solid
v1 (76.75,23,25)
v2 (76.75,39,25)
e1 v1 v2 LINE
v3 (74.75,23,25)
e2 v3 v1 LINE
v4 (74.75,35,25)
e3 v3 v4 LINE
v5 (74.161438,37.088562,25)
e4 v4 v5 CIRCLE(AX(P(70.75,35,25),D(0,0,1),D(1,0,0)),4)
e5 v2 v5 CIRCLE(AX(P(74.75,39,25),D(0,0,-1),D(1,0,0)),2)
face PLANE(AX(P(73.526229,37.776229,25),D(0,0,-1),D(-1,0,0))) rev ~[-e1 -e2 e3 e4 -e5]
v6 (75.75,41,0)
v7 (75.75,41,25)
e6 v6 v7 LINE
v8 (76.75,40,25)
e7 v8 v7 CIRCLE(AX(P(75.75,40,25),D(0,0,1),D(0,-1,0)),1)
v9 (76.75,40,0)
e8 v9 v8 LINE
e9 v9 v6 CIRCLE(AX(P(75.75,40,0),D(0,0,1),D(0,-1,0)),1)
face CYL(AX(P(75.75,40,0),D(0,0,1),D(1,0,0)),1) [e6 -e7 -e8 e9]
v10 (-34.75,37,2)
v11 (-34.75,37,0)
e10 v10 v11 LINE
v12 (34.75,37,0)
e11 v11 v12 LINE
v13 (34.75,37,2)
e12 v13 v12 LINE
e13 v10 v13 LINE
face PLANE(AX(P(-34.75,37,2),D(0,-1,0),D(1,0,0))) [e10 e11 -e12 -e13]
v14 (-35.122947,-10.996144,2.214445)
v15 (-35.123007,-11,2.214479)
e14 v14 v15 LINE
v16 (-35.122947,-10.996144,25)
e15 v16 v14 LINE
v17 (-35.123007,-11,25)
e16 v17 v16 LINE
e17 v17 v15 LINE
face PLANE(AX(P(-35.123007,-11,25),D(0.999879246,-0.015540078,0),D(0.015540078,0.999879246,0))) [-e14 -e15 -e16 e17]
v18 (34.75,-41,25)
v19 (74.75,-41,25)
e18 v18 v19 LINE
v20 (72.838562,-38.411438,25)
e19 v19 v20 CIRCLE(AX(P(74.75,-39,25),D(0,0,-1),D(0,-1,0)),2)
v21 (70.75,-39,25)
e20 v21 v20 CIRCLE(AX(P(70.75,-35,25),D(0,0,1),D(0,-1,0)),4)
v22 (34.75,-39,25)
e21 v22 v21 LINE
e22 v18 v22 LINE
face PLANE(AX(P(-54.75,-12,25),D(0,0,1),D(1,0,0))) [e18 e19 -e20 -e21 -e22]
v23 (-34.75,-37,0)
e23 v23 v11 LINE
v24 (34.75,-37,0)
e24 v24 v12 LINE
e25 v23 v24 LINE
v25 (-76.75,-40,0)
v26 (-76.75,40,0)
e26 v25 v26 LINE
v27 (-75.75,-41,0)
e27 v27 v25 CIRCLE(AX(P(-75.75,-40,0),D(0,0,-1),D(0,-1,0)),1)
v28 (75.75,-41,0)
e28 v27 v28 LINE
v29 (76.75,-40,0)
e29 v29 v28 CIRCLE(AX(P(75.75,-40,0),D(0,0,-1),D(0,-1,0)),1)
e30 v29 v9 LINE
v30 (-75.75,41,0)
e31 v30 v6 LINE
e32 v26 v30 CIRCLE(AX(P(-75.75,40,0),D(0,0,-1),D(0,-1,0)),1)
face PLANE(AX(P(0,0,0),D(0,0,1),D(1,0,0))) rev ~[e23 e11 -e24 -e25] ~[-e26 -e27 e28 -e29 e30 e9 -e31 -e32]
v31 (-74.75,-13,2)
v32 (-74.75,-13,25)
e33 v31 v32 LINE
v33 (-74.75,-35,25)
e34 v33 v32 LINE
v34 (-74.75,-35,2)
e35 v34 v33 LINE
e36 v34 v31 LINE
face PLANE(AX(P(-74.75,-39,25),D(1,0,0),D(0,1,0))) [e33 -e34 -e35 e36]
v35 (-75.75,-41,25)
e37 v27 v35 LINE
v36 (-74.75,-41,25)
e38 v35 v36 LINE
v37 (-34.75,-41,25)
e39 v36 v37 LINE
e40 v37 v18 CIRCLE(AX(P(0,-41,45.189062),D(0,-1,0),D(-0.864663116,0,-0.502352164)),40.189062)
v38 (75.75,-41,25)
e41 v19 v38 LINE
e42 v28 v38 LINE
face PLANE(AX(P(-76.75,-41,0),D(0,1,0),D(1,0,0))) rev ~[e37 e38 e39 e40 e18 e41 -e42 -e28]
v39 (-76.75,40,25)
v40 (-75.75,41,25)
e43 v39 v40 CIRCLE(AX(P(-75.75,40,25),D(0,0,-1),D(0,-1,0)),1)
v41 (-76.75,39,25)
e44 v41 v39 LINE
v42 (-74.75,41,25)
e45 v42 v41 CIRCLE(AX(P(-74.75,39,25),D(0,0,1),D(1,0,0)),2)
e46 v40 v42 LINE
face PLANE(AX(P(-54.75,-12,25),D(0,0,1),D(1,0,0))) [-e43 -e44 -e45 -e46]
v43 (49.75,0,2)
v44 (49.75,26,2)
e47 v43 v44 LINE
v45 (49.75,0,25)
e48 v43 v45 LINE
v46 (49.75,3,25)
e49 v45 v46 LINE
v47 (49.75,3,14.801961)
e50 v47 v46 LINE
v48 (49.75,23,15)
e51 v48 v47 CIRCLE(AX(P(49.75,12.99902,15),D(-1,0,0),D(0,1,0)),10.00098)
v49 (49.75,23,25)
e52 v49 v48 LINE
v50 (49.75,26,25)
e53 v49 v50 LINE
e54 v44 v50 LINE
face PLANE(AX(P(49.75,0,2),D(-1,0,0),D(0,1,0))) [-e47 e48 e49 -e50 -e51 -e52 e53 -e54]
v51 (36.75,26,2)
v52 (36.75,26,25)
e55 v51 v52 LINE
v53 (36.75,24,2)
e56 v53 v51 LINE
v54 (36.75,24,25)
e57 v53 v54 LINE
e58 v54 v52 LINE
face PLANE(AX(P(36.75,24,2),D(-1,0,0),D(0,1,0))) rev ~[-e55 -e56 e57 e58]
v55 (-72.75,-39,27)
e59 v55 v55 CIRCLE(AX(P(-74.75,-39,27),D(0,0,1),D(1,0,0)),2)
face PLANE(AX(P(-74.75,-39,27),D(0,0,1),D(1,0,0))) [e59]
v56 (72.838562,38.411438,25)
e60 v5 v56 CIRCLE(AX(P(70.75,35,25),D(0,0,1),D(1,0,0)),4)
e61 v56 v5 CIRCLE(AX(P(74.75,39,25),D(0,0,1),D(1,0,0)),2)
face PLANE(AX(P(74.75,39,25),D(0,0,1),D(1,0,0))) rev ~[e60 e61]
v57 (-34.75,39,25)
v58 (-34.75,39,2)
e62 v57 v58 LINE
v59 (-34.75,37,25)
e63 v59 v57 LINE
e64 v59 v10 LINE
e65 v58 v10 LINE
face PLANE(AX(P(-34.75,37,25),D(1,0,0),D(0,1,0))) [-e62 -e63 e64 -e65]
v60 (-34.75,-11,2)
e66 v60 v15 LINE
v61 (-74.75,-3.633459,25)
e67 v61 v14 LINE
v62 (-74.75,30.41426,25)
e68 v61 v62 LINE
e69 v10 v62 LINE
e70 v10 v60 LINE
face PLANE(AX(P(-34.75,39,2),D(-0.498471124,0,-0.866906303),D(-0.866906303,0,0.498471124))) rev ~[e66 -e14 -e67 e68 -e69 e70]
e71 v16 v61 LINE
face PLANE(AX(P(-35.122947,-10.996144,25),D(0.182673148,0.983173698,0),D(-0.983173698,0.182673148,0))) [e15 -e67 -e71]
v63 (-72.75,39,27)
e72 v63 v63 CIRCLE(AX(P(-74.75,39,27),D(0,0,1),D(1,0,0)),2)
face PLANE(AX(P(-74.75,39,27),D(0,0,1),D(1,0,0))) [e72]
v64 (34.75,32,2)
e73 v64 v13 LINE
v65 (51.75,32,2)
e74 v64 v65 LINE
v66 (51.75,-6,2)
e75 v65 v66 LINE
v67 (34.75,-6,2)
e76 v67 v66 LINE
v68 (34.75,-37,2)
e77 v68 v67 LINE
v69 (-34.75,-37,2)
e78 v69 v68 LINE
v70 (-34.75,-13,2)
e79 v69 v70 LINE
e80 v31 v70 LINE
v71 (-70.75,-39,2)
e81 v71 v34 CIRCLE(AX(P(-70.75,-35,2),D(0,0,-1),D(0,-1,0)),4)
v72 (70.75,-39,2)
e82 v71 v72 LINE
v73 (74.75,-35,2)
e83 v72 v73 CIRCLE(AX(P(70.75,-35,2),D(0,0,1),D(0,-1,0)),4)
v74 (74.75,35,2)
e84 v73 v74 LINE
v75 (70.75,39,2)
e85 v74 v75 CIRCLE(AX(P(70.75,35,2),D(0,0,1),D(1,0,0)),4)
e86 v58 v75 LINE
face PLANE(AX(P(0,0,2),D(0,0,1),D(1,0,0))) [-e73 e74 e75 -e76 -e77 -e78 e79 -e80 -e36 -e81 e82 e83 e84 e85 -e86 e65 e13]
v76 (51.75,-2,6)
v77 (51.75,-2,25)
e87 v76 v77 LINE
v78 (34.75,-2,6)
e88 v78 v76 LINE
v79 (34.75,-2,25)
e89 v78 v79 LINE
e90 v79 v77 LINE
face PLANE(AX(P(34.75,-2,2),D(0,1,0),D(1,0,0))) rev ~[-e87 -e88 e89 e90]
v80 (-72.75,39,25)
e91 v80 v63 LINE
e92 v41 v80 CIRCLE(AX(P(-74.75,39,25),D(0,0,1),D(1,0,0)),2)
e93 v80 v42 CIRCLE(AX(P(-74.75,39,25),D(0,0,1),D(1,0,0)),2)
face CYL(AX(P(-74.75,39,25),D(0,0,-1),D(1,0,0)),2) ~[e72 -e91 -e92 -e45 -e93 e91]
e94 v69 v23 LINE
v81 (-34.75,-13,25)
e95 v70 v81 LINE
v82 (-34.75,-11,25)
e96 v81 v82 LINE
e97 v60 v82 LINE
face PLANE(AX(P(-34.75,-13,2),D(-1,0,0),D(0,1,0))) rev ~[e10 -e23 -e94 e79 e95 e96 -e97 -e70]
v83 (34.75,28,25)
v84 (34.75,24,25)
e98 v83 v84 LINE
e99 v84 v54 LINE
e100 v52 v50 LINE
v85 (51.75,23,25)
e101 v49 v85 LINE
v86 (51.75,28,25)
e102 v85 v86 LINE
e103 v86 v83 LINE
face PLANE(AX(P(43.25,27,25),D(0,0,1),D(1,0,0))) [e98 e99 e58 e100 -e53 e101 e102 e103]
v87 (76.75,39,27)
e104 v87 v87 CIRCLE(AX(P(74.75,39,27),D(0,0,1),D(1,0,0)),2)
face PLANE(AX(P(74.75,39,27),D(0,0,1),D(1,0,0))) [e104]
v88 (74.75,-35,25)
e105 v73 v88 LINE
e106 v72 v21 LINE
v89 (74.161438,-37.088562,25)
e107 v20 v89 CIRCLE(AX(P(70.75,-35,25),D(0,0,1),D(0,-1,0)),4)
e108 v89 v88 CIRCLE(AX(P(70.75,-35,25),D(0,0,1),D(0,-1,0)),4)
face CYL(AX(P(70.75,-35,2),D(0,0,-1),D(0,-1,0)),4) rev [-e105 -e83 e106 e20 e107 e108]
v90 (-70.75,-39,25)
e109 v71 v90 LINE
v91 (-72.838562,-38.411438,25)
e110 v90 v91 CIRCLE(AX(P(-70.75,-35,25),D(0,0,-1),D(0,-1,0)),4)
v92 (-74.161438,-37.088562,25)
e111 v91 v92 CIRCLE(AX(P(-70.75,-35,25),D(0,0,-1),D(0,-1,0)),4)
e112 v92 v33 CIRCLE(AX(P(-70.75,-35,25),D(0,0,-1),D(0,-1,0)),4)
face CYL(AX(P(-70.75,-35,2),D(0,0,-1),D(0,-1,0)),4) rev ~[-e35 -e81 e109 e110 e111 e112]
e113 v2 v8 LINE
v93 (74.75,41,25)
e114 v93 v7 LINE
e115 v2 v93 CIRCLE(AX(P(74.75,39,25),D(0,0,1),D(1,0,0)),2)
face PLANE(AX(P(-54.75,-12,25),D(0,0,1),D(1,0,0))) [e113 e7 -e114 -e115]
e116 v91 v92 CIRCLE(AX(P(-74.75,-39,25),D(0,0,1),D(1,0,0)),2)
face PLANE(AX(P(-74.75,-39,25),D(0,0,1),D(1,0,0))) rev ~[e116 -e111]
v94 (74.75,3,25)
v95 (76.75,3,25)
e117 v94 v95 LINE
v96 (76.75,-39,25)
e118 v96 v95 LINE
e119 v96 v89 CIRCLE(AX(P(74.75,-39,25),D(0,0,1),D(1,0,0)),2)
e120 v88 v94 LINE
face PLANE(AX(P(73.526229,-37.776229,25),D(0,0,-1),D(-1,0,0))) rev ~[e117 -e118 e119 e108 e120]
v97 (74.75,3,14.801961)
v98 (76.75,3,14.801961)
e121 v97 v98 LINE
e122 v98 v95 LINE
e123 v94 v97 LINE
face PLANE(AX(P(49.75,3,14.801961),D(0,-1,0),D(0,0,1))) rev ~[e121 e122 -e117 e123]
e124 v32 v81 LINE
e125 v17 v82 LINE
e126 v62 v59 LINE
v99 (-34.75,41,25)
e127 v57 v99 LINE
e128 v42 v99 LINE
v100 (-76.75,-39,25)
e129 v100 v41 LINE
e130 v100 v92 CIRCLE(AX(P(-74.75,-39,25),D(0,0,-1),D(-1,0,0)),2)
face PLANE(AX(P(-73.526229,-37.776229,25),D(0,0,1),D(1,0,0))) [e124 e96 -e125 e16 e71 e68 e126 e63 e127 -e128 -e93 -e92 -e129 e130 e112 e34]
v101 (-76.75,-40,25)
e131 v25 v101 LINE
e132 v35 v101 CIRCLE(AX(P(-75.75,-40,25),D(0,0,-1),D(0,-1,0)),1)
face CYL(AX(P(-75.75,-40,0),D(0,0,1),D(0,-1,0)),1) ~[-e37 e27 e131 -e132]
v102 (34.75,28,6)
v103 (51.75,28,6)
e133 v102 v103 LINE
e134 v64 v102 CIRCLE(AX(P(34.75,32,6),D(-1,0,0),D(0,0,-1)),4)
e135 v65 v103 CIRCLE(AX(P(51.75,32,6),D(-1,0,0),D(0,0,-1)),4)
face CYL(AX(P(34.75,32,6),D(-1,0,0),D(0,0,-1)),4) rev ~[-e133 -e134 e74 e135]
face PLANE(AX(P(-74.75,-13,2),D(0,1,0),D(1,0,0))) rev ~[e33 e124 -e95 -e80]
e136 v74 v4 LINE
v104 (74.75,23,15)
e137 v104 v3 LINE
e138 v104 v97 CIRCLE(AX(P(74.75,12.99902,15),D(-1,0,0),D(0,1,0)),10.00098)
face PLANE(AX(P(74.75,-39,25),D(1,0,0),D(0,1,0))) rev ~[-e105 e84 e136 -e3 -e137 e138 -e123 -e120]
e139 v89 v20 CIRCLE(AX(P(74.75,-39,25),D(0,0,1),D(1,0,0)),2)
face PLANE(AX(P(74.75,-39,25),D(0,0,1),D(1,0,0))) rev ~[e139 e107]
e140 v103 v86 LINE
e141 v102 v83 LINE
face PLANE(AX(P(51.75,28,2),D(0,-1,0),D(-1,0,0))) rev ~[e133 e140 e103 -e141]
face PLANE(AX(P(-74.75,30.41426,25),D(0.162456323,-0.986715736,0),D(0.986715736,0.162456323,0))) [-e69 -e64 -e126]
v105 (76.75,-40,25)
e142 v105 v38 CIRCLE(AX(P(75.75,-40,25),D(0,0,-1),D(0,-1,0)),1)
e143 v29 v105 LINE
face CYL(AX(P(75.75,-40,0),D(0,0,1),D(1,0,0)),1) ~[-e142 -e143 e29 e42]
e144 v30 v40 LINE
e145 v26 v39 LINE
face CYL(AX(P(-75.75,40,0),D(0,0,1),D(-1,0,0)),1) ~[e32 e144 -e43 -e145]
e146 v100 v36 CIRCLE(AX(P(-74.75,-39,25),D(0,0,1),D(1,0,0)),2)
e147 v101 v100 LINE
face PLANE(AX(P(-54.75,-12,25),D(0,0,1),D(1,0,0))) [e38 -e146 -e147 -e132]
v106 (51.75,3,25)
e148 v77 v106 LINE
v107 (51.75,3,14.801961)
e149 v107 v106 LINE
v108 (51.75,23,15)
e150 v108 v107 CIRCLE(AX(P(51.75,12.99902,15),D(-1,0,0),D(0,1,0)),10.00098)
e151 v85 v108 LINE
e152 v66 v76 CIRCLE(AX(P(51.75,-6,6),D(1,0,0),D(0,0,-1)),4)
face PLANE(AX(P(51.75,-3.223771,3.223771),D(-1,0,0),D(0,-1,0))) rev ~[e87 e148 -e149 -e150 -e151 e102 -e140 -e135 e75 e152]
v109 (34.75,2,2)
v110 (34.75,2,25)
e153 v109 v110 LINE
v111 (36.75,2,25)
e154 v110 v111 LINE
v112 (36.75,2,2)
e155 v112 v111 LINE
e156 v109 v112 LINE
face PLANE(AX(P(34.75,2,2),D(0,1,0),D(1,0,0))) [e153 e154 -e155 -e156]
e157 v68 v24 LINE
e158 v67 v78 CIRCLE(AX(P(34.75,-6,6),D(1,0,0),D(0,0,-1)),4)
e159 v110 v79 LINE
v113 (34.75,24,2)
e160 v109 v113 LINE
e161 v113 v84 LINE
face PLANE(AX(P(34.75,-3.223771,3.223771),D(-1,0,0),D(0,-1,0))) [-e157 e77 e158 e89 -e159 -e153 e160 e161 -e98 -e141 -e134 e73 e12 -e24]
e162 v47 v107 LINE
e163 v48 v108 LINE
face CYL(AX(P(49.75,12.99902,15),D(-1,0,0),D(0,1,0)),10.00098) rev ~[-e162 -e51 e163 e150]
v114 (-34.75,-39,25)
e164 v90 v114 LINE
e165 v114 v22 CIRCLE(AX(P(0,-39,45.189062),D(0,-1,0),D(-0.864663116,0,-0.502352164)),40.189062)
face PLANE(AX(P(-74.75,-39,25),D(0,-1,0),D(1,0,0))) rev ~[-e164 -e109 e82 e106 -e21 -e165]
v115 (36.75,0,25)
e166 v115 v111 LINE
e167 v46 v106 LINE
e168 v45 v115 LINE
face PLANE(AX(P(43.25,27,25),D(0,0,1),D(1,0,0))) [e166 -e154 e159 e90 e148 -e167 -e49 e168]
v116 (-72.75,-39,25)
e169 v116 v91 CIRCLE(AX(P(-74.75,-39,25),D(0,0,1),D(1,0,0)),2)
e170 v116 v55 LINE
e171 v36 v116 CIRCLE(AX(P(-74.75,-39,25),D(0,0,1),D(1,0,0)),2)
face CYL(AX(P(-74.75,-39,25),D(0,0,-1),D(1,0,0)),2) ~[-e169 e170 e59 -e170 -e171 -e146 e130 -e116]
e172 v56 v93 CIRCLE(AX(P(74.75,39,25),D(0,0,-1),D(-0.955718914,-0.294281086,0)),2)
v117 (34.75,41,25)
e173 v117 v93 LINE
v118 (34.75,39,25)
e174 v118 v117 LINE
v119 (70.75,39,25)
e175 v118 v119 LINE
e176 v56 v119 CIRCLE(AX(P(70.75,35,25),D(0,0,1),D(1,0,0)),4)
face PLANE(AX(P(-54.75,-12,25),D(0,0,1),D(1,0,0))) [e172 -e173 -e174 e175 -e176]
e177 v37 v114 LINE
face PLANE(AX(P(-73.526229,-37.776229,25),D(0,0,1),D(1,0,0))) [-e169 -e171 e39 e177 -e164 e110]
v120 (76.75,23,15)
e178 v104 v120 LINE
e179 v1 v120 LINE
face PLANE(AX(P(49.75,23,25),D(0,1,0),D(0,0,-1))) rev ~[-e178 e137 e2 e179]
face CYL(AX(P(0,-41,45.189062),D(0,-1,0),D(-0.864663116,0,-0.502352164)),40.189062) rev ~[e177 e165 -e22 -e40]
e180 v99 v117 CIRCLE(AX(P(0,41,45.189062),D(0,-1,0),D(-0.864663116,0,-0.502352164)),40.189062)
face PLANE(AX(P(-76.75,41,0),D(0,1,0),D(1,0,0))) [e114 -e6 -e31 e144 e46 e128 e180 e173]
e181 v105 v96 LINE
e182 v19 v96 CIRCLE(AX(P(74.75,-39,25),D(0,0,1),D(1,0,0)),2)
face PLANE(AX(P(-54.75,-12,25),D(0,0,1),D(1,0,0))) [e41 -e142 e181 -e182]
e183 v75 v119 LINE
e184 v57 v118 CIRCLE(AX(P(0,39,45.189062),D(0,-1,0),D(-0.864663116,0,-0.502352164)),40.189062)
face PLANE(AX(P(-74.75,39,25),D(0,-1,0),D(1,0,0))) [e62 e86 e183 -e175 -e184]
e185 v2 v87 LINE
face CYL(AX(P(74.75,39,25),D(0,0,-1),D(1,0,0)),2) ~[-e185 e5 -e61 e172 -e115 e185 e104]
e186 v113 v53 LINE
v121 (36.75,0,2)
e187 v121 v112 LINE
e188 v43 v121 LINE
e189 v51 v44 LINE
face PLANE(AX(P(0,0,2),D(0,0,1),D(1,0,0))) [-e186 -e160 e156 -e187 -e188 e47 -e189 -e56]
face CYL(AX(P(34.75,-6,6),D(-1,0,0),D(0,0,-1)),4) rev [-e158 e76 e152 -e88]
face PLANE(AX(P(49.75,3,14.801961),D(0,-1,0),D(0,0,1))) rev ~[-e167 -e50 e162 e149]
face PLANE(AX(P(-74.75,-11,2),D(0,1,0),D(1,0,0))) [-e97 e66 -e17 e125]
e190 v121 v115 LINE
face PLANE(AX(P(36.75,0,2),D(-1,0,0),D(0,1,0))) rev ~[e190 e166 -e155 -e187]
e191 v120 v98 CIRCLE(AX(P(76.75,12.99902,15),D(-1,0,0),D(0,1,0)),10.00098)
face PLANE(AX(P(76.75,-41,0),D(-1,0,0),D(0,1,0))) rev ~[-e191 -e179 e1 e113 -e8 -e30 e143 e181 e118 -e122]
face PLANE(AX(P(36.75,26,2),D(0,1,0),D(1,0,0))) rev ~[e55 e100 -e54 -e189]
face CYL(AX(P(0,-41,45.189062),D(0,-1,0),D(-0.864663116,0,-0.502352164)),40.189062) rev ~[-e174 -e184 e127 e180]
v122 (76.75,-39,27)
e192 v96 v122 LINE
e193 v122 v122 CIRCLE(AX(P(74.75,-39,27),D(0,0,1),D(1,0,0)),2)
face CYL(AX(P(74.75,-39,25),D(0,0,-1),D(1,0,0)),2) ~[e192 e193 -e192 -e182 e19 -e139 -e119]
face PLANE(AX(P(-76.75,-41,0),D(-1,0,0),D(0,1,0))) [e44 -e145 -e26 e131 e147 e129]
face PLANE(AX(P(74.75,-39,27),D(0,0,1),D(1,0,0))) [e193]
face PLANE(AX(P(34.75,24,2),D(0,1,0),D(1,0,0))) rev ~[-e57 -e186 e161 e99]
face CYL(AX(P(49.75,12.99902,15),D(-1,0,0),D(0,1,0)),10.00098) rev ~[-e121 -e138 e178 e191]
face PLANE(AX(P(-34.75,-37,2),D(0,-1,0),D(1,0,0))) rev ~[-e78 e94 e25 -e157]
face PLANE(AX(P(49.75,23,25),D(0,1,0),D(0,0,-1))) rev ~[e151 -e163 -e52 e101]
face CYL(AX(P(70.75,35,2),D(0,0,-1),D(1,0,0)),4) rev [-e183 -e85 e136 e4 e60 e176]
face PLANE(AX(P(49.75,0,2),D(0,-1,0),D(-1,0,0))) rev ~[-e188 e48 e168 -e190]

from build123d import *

# Parameters (mm, degrees)
F0_W         = 153.5
F0_H         = 82
F1_DEPTH     = 25
F2_W         = 149.5
F2_H         = 78
F3_DEPTH     = 23
F5_DEPTH     = 50
F6_W         = 40
F6_H         = 2
F7_DEPTH     = 23
F8_W         = 69.5
F8_H         = 74
F9_DEPTH     = 2.001
F12_DEPTH    = 25
F14_W        = 2
F14_H        = 26
F14_H_2      = 2
F15_DEPTH    = 23
F17_DEPTH    = 27.001
F19_DEPTH    = 82.001
F20_R        = 2
F21_DEPTH    = 2
F22_T1_DEPTH = 23
F22_T3_DEPTH = 17
F23_R        = 1


# Not quite as in the source:
# - a fillet or chamfer that OpenCascade refuses, or shapes differently, is made with other operations: its cross-section is extruded or revolved along the edge and cut away or added


with BuildPart() as f1:
    # F0 (on Top) → F1 (new body)
    with BuildSketch(Plane.XY):
        Rectangle(F0_W, F0_H)
    extrude(amount=F1_DEPTH)

    # F2 (on face) → F3 (cut)
    with BuildSketch(Plane.XY.offset(25)):
        Rectangle(F2_W, F2_H)
    extrude(amount=-F3_DEPTH, mode=Mode.SUBTRACT)

    # F4 (on face) → F5 (join)
    with BuildSketch(Plane.XZ.offset(-39)):
        Polygon((-34.75, 2), (-74.75, 25), (-74.75, 2), align=None)
    extrude(amount=F5_DEPTH)

    # F6 (on face) → F7 (join)
    with BuildSketch(Plane.XY.offset(2)):
        with Locations((-54.75, -12)):
            Rectangle(F6_W, F6_H)
    extrude(amount=F7_DEPTH)

    # F8 (on face) → F9 (cut, through all)
    with BuildSketch(Plane.XY.offset(2)):
        Rectangle(F8_W, F8_H)
    extrude(amount=-F9_DEPTH, mode=Mode.SUBTRACT)

    # F11 (on face) → F12 (join)
    with BuildSketch(Plane.XY.offset(25)):
        Polygon((-74.75, 39), (-74.75, 30.4142603609), (-34.75, 37), (-34.75, 39), align=None)
        Polygon((-74.75, -11), (-35.1230073053, -11), (-35.1229473745, -10.9961439342), (-74.75, -3.6334587345), align=None)
    extrude(amount=-F12_DEPTH)

    # F14 (on face) → F15 (join)
    with BuildSketch(Plane.XY.offset(2)):
        Polygon((36.75, 26), (49.75, 26), (51.75, 26), (51.75, 28), (34.75, 28), (34.75, 26), align=None)
        with Locations((50.75, 13)):
            Rectangle(F14_W, F14_H)
        Polygon((51.75, 0), (49.75, 0), (36.75, 0), (34.75, 0), (34.75, -2), (51.75, -2), align=None)
        with Locations((35.75, 25)):
            Rectangle(F14_W, F14_H_2)
        with Locations((35.75, 1)):
            Rectangle(F14_W, F14_H_2)
    extrude(amount=F15_DEPTH)

    # F16 (on face) → F17 (cut, through all)
    with BuildSketch(Plane(origin=(49.75, 0, 0), x_dir=(0, -1, 0), z_dir=(-1, 0, 0))):
        with BuildLine():
            Line((-3, 25), (-23, 25))
            Line((-23, 25), (-23, 15))
            ThreePointArc((-23, 15), (-13.0980438814, 4.9995097688), (-3, 14.8019609728))
            Line((-3, 14.8019609728), (-3, 25))
        make_face()
    extrude(amount=-F17_DEPTH, mode=Mode.SUBTRACT)

    # F18 (on face) → F19 (cut, through all)
    with BuildSketch(Plane.XZ.offset(41)):
        with BuildLine():
            Line((34.75, 25), (-34.75, 25))
            ThreePointArc((-34.75, 25), (0, 5), (34.75, 25))
        make_face()
    extrude(amount=-F19_DEPTH, mode=Mode.SUBTRACT)

    # F20 (on face) → F21 (join)
    with BuildSketch(Plane.XY.offset(25)):
        with Locations((-74.75, 39)):
            Circle(F20_R)
        with Locations((74.75, 39)):
            Circle(F20_R)
        with Locations((-74.75, -39)):
            Circle(F20_R)
        with Locations((74.75, -39)):
            Circle(F20_R)
    extrude(amount=F21_DEPTH)

    # F22: fillet of radius 4 on 5 edges, made by hand

    # F22_s2 → F22_t1 (join)
    with BuildSketch(Plane.XY.offset(2)):
        with BuildLine():
            ThreePointArc((-70.75, -39), (-73.5784271247, -37.8284271247), (-74.75, -35))
            Line((-74.75, -35), (-74.75, -39))
            Line((-74.75, -39), (-70.75, -39))
        make_face()
        with BuildLine():
            ThreePointArc((74.75, 35), (73.5784271247, 37.8284271247), (70.75, 39))
            Line((70.75, 39), (74.75, 39))
            Line((74.75, 39), (74.75, 35))
        make_face()
        with BuildLine():
            ThreePointArc((70.75, -39), (73.5784271247, -37.8284271247), (74.75, -35))
            Line((74.75, -35), (74.75, -39))
            Line((74.75, -39), (70.75, -39))
        make_face()
    extrude(amount=F22_T1_DEPTH)

    # F22_s4 → F22_t3 (join)
    with BuildSketch(Plane.YZ.offset(34.75)):
        with BuildLine():
            ThreePointArc((-6, 2), (-3.1715728753, 3.1715728753), (-2, 6))
            Line((-2, 6), (-2, 2))
            Line((-2, 2), (-6, 2))
        make_face()
        with BuildLine():
            ThreePointArc((32, 2), (29.1715728753, 3.1715728753), (28, 6))
            Line((28, 6), (28, 2))
            Line((28, 2), (32, 2))
        make_face()
    extrude(amount=F22_T3_DEPTH)

    # F23
    f23_edges = [f1.edges().sort_by_distance(p)[0] for p in [
        (76.75, -41, 12.5),
        (-76.75, -41, 12.5),
        (-76.75, 41, 12.5),
        (76.75, 41, 12.5),
    ]]
    fillet(f23_edges, radius=F23_R)


solid = f1.part
